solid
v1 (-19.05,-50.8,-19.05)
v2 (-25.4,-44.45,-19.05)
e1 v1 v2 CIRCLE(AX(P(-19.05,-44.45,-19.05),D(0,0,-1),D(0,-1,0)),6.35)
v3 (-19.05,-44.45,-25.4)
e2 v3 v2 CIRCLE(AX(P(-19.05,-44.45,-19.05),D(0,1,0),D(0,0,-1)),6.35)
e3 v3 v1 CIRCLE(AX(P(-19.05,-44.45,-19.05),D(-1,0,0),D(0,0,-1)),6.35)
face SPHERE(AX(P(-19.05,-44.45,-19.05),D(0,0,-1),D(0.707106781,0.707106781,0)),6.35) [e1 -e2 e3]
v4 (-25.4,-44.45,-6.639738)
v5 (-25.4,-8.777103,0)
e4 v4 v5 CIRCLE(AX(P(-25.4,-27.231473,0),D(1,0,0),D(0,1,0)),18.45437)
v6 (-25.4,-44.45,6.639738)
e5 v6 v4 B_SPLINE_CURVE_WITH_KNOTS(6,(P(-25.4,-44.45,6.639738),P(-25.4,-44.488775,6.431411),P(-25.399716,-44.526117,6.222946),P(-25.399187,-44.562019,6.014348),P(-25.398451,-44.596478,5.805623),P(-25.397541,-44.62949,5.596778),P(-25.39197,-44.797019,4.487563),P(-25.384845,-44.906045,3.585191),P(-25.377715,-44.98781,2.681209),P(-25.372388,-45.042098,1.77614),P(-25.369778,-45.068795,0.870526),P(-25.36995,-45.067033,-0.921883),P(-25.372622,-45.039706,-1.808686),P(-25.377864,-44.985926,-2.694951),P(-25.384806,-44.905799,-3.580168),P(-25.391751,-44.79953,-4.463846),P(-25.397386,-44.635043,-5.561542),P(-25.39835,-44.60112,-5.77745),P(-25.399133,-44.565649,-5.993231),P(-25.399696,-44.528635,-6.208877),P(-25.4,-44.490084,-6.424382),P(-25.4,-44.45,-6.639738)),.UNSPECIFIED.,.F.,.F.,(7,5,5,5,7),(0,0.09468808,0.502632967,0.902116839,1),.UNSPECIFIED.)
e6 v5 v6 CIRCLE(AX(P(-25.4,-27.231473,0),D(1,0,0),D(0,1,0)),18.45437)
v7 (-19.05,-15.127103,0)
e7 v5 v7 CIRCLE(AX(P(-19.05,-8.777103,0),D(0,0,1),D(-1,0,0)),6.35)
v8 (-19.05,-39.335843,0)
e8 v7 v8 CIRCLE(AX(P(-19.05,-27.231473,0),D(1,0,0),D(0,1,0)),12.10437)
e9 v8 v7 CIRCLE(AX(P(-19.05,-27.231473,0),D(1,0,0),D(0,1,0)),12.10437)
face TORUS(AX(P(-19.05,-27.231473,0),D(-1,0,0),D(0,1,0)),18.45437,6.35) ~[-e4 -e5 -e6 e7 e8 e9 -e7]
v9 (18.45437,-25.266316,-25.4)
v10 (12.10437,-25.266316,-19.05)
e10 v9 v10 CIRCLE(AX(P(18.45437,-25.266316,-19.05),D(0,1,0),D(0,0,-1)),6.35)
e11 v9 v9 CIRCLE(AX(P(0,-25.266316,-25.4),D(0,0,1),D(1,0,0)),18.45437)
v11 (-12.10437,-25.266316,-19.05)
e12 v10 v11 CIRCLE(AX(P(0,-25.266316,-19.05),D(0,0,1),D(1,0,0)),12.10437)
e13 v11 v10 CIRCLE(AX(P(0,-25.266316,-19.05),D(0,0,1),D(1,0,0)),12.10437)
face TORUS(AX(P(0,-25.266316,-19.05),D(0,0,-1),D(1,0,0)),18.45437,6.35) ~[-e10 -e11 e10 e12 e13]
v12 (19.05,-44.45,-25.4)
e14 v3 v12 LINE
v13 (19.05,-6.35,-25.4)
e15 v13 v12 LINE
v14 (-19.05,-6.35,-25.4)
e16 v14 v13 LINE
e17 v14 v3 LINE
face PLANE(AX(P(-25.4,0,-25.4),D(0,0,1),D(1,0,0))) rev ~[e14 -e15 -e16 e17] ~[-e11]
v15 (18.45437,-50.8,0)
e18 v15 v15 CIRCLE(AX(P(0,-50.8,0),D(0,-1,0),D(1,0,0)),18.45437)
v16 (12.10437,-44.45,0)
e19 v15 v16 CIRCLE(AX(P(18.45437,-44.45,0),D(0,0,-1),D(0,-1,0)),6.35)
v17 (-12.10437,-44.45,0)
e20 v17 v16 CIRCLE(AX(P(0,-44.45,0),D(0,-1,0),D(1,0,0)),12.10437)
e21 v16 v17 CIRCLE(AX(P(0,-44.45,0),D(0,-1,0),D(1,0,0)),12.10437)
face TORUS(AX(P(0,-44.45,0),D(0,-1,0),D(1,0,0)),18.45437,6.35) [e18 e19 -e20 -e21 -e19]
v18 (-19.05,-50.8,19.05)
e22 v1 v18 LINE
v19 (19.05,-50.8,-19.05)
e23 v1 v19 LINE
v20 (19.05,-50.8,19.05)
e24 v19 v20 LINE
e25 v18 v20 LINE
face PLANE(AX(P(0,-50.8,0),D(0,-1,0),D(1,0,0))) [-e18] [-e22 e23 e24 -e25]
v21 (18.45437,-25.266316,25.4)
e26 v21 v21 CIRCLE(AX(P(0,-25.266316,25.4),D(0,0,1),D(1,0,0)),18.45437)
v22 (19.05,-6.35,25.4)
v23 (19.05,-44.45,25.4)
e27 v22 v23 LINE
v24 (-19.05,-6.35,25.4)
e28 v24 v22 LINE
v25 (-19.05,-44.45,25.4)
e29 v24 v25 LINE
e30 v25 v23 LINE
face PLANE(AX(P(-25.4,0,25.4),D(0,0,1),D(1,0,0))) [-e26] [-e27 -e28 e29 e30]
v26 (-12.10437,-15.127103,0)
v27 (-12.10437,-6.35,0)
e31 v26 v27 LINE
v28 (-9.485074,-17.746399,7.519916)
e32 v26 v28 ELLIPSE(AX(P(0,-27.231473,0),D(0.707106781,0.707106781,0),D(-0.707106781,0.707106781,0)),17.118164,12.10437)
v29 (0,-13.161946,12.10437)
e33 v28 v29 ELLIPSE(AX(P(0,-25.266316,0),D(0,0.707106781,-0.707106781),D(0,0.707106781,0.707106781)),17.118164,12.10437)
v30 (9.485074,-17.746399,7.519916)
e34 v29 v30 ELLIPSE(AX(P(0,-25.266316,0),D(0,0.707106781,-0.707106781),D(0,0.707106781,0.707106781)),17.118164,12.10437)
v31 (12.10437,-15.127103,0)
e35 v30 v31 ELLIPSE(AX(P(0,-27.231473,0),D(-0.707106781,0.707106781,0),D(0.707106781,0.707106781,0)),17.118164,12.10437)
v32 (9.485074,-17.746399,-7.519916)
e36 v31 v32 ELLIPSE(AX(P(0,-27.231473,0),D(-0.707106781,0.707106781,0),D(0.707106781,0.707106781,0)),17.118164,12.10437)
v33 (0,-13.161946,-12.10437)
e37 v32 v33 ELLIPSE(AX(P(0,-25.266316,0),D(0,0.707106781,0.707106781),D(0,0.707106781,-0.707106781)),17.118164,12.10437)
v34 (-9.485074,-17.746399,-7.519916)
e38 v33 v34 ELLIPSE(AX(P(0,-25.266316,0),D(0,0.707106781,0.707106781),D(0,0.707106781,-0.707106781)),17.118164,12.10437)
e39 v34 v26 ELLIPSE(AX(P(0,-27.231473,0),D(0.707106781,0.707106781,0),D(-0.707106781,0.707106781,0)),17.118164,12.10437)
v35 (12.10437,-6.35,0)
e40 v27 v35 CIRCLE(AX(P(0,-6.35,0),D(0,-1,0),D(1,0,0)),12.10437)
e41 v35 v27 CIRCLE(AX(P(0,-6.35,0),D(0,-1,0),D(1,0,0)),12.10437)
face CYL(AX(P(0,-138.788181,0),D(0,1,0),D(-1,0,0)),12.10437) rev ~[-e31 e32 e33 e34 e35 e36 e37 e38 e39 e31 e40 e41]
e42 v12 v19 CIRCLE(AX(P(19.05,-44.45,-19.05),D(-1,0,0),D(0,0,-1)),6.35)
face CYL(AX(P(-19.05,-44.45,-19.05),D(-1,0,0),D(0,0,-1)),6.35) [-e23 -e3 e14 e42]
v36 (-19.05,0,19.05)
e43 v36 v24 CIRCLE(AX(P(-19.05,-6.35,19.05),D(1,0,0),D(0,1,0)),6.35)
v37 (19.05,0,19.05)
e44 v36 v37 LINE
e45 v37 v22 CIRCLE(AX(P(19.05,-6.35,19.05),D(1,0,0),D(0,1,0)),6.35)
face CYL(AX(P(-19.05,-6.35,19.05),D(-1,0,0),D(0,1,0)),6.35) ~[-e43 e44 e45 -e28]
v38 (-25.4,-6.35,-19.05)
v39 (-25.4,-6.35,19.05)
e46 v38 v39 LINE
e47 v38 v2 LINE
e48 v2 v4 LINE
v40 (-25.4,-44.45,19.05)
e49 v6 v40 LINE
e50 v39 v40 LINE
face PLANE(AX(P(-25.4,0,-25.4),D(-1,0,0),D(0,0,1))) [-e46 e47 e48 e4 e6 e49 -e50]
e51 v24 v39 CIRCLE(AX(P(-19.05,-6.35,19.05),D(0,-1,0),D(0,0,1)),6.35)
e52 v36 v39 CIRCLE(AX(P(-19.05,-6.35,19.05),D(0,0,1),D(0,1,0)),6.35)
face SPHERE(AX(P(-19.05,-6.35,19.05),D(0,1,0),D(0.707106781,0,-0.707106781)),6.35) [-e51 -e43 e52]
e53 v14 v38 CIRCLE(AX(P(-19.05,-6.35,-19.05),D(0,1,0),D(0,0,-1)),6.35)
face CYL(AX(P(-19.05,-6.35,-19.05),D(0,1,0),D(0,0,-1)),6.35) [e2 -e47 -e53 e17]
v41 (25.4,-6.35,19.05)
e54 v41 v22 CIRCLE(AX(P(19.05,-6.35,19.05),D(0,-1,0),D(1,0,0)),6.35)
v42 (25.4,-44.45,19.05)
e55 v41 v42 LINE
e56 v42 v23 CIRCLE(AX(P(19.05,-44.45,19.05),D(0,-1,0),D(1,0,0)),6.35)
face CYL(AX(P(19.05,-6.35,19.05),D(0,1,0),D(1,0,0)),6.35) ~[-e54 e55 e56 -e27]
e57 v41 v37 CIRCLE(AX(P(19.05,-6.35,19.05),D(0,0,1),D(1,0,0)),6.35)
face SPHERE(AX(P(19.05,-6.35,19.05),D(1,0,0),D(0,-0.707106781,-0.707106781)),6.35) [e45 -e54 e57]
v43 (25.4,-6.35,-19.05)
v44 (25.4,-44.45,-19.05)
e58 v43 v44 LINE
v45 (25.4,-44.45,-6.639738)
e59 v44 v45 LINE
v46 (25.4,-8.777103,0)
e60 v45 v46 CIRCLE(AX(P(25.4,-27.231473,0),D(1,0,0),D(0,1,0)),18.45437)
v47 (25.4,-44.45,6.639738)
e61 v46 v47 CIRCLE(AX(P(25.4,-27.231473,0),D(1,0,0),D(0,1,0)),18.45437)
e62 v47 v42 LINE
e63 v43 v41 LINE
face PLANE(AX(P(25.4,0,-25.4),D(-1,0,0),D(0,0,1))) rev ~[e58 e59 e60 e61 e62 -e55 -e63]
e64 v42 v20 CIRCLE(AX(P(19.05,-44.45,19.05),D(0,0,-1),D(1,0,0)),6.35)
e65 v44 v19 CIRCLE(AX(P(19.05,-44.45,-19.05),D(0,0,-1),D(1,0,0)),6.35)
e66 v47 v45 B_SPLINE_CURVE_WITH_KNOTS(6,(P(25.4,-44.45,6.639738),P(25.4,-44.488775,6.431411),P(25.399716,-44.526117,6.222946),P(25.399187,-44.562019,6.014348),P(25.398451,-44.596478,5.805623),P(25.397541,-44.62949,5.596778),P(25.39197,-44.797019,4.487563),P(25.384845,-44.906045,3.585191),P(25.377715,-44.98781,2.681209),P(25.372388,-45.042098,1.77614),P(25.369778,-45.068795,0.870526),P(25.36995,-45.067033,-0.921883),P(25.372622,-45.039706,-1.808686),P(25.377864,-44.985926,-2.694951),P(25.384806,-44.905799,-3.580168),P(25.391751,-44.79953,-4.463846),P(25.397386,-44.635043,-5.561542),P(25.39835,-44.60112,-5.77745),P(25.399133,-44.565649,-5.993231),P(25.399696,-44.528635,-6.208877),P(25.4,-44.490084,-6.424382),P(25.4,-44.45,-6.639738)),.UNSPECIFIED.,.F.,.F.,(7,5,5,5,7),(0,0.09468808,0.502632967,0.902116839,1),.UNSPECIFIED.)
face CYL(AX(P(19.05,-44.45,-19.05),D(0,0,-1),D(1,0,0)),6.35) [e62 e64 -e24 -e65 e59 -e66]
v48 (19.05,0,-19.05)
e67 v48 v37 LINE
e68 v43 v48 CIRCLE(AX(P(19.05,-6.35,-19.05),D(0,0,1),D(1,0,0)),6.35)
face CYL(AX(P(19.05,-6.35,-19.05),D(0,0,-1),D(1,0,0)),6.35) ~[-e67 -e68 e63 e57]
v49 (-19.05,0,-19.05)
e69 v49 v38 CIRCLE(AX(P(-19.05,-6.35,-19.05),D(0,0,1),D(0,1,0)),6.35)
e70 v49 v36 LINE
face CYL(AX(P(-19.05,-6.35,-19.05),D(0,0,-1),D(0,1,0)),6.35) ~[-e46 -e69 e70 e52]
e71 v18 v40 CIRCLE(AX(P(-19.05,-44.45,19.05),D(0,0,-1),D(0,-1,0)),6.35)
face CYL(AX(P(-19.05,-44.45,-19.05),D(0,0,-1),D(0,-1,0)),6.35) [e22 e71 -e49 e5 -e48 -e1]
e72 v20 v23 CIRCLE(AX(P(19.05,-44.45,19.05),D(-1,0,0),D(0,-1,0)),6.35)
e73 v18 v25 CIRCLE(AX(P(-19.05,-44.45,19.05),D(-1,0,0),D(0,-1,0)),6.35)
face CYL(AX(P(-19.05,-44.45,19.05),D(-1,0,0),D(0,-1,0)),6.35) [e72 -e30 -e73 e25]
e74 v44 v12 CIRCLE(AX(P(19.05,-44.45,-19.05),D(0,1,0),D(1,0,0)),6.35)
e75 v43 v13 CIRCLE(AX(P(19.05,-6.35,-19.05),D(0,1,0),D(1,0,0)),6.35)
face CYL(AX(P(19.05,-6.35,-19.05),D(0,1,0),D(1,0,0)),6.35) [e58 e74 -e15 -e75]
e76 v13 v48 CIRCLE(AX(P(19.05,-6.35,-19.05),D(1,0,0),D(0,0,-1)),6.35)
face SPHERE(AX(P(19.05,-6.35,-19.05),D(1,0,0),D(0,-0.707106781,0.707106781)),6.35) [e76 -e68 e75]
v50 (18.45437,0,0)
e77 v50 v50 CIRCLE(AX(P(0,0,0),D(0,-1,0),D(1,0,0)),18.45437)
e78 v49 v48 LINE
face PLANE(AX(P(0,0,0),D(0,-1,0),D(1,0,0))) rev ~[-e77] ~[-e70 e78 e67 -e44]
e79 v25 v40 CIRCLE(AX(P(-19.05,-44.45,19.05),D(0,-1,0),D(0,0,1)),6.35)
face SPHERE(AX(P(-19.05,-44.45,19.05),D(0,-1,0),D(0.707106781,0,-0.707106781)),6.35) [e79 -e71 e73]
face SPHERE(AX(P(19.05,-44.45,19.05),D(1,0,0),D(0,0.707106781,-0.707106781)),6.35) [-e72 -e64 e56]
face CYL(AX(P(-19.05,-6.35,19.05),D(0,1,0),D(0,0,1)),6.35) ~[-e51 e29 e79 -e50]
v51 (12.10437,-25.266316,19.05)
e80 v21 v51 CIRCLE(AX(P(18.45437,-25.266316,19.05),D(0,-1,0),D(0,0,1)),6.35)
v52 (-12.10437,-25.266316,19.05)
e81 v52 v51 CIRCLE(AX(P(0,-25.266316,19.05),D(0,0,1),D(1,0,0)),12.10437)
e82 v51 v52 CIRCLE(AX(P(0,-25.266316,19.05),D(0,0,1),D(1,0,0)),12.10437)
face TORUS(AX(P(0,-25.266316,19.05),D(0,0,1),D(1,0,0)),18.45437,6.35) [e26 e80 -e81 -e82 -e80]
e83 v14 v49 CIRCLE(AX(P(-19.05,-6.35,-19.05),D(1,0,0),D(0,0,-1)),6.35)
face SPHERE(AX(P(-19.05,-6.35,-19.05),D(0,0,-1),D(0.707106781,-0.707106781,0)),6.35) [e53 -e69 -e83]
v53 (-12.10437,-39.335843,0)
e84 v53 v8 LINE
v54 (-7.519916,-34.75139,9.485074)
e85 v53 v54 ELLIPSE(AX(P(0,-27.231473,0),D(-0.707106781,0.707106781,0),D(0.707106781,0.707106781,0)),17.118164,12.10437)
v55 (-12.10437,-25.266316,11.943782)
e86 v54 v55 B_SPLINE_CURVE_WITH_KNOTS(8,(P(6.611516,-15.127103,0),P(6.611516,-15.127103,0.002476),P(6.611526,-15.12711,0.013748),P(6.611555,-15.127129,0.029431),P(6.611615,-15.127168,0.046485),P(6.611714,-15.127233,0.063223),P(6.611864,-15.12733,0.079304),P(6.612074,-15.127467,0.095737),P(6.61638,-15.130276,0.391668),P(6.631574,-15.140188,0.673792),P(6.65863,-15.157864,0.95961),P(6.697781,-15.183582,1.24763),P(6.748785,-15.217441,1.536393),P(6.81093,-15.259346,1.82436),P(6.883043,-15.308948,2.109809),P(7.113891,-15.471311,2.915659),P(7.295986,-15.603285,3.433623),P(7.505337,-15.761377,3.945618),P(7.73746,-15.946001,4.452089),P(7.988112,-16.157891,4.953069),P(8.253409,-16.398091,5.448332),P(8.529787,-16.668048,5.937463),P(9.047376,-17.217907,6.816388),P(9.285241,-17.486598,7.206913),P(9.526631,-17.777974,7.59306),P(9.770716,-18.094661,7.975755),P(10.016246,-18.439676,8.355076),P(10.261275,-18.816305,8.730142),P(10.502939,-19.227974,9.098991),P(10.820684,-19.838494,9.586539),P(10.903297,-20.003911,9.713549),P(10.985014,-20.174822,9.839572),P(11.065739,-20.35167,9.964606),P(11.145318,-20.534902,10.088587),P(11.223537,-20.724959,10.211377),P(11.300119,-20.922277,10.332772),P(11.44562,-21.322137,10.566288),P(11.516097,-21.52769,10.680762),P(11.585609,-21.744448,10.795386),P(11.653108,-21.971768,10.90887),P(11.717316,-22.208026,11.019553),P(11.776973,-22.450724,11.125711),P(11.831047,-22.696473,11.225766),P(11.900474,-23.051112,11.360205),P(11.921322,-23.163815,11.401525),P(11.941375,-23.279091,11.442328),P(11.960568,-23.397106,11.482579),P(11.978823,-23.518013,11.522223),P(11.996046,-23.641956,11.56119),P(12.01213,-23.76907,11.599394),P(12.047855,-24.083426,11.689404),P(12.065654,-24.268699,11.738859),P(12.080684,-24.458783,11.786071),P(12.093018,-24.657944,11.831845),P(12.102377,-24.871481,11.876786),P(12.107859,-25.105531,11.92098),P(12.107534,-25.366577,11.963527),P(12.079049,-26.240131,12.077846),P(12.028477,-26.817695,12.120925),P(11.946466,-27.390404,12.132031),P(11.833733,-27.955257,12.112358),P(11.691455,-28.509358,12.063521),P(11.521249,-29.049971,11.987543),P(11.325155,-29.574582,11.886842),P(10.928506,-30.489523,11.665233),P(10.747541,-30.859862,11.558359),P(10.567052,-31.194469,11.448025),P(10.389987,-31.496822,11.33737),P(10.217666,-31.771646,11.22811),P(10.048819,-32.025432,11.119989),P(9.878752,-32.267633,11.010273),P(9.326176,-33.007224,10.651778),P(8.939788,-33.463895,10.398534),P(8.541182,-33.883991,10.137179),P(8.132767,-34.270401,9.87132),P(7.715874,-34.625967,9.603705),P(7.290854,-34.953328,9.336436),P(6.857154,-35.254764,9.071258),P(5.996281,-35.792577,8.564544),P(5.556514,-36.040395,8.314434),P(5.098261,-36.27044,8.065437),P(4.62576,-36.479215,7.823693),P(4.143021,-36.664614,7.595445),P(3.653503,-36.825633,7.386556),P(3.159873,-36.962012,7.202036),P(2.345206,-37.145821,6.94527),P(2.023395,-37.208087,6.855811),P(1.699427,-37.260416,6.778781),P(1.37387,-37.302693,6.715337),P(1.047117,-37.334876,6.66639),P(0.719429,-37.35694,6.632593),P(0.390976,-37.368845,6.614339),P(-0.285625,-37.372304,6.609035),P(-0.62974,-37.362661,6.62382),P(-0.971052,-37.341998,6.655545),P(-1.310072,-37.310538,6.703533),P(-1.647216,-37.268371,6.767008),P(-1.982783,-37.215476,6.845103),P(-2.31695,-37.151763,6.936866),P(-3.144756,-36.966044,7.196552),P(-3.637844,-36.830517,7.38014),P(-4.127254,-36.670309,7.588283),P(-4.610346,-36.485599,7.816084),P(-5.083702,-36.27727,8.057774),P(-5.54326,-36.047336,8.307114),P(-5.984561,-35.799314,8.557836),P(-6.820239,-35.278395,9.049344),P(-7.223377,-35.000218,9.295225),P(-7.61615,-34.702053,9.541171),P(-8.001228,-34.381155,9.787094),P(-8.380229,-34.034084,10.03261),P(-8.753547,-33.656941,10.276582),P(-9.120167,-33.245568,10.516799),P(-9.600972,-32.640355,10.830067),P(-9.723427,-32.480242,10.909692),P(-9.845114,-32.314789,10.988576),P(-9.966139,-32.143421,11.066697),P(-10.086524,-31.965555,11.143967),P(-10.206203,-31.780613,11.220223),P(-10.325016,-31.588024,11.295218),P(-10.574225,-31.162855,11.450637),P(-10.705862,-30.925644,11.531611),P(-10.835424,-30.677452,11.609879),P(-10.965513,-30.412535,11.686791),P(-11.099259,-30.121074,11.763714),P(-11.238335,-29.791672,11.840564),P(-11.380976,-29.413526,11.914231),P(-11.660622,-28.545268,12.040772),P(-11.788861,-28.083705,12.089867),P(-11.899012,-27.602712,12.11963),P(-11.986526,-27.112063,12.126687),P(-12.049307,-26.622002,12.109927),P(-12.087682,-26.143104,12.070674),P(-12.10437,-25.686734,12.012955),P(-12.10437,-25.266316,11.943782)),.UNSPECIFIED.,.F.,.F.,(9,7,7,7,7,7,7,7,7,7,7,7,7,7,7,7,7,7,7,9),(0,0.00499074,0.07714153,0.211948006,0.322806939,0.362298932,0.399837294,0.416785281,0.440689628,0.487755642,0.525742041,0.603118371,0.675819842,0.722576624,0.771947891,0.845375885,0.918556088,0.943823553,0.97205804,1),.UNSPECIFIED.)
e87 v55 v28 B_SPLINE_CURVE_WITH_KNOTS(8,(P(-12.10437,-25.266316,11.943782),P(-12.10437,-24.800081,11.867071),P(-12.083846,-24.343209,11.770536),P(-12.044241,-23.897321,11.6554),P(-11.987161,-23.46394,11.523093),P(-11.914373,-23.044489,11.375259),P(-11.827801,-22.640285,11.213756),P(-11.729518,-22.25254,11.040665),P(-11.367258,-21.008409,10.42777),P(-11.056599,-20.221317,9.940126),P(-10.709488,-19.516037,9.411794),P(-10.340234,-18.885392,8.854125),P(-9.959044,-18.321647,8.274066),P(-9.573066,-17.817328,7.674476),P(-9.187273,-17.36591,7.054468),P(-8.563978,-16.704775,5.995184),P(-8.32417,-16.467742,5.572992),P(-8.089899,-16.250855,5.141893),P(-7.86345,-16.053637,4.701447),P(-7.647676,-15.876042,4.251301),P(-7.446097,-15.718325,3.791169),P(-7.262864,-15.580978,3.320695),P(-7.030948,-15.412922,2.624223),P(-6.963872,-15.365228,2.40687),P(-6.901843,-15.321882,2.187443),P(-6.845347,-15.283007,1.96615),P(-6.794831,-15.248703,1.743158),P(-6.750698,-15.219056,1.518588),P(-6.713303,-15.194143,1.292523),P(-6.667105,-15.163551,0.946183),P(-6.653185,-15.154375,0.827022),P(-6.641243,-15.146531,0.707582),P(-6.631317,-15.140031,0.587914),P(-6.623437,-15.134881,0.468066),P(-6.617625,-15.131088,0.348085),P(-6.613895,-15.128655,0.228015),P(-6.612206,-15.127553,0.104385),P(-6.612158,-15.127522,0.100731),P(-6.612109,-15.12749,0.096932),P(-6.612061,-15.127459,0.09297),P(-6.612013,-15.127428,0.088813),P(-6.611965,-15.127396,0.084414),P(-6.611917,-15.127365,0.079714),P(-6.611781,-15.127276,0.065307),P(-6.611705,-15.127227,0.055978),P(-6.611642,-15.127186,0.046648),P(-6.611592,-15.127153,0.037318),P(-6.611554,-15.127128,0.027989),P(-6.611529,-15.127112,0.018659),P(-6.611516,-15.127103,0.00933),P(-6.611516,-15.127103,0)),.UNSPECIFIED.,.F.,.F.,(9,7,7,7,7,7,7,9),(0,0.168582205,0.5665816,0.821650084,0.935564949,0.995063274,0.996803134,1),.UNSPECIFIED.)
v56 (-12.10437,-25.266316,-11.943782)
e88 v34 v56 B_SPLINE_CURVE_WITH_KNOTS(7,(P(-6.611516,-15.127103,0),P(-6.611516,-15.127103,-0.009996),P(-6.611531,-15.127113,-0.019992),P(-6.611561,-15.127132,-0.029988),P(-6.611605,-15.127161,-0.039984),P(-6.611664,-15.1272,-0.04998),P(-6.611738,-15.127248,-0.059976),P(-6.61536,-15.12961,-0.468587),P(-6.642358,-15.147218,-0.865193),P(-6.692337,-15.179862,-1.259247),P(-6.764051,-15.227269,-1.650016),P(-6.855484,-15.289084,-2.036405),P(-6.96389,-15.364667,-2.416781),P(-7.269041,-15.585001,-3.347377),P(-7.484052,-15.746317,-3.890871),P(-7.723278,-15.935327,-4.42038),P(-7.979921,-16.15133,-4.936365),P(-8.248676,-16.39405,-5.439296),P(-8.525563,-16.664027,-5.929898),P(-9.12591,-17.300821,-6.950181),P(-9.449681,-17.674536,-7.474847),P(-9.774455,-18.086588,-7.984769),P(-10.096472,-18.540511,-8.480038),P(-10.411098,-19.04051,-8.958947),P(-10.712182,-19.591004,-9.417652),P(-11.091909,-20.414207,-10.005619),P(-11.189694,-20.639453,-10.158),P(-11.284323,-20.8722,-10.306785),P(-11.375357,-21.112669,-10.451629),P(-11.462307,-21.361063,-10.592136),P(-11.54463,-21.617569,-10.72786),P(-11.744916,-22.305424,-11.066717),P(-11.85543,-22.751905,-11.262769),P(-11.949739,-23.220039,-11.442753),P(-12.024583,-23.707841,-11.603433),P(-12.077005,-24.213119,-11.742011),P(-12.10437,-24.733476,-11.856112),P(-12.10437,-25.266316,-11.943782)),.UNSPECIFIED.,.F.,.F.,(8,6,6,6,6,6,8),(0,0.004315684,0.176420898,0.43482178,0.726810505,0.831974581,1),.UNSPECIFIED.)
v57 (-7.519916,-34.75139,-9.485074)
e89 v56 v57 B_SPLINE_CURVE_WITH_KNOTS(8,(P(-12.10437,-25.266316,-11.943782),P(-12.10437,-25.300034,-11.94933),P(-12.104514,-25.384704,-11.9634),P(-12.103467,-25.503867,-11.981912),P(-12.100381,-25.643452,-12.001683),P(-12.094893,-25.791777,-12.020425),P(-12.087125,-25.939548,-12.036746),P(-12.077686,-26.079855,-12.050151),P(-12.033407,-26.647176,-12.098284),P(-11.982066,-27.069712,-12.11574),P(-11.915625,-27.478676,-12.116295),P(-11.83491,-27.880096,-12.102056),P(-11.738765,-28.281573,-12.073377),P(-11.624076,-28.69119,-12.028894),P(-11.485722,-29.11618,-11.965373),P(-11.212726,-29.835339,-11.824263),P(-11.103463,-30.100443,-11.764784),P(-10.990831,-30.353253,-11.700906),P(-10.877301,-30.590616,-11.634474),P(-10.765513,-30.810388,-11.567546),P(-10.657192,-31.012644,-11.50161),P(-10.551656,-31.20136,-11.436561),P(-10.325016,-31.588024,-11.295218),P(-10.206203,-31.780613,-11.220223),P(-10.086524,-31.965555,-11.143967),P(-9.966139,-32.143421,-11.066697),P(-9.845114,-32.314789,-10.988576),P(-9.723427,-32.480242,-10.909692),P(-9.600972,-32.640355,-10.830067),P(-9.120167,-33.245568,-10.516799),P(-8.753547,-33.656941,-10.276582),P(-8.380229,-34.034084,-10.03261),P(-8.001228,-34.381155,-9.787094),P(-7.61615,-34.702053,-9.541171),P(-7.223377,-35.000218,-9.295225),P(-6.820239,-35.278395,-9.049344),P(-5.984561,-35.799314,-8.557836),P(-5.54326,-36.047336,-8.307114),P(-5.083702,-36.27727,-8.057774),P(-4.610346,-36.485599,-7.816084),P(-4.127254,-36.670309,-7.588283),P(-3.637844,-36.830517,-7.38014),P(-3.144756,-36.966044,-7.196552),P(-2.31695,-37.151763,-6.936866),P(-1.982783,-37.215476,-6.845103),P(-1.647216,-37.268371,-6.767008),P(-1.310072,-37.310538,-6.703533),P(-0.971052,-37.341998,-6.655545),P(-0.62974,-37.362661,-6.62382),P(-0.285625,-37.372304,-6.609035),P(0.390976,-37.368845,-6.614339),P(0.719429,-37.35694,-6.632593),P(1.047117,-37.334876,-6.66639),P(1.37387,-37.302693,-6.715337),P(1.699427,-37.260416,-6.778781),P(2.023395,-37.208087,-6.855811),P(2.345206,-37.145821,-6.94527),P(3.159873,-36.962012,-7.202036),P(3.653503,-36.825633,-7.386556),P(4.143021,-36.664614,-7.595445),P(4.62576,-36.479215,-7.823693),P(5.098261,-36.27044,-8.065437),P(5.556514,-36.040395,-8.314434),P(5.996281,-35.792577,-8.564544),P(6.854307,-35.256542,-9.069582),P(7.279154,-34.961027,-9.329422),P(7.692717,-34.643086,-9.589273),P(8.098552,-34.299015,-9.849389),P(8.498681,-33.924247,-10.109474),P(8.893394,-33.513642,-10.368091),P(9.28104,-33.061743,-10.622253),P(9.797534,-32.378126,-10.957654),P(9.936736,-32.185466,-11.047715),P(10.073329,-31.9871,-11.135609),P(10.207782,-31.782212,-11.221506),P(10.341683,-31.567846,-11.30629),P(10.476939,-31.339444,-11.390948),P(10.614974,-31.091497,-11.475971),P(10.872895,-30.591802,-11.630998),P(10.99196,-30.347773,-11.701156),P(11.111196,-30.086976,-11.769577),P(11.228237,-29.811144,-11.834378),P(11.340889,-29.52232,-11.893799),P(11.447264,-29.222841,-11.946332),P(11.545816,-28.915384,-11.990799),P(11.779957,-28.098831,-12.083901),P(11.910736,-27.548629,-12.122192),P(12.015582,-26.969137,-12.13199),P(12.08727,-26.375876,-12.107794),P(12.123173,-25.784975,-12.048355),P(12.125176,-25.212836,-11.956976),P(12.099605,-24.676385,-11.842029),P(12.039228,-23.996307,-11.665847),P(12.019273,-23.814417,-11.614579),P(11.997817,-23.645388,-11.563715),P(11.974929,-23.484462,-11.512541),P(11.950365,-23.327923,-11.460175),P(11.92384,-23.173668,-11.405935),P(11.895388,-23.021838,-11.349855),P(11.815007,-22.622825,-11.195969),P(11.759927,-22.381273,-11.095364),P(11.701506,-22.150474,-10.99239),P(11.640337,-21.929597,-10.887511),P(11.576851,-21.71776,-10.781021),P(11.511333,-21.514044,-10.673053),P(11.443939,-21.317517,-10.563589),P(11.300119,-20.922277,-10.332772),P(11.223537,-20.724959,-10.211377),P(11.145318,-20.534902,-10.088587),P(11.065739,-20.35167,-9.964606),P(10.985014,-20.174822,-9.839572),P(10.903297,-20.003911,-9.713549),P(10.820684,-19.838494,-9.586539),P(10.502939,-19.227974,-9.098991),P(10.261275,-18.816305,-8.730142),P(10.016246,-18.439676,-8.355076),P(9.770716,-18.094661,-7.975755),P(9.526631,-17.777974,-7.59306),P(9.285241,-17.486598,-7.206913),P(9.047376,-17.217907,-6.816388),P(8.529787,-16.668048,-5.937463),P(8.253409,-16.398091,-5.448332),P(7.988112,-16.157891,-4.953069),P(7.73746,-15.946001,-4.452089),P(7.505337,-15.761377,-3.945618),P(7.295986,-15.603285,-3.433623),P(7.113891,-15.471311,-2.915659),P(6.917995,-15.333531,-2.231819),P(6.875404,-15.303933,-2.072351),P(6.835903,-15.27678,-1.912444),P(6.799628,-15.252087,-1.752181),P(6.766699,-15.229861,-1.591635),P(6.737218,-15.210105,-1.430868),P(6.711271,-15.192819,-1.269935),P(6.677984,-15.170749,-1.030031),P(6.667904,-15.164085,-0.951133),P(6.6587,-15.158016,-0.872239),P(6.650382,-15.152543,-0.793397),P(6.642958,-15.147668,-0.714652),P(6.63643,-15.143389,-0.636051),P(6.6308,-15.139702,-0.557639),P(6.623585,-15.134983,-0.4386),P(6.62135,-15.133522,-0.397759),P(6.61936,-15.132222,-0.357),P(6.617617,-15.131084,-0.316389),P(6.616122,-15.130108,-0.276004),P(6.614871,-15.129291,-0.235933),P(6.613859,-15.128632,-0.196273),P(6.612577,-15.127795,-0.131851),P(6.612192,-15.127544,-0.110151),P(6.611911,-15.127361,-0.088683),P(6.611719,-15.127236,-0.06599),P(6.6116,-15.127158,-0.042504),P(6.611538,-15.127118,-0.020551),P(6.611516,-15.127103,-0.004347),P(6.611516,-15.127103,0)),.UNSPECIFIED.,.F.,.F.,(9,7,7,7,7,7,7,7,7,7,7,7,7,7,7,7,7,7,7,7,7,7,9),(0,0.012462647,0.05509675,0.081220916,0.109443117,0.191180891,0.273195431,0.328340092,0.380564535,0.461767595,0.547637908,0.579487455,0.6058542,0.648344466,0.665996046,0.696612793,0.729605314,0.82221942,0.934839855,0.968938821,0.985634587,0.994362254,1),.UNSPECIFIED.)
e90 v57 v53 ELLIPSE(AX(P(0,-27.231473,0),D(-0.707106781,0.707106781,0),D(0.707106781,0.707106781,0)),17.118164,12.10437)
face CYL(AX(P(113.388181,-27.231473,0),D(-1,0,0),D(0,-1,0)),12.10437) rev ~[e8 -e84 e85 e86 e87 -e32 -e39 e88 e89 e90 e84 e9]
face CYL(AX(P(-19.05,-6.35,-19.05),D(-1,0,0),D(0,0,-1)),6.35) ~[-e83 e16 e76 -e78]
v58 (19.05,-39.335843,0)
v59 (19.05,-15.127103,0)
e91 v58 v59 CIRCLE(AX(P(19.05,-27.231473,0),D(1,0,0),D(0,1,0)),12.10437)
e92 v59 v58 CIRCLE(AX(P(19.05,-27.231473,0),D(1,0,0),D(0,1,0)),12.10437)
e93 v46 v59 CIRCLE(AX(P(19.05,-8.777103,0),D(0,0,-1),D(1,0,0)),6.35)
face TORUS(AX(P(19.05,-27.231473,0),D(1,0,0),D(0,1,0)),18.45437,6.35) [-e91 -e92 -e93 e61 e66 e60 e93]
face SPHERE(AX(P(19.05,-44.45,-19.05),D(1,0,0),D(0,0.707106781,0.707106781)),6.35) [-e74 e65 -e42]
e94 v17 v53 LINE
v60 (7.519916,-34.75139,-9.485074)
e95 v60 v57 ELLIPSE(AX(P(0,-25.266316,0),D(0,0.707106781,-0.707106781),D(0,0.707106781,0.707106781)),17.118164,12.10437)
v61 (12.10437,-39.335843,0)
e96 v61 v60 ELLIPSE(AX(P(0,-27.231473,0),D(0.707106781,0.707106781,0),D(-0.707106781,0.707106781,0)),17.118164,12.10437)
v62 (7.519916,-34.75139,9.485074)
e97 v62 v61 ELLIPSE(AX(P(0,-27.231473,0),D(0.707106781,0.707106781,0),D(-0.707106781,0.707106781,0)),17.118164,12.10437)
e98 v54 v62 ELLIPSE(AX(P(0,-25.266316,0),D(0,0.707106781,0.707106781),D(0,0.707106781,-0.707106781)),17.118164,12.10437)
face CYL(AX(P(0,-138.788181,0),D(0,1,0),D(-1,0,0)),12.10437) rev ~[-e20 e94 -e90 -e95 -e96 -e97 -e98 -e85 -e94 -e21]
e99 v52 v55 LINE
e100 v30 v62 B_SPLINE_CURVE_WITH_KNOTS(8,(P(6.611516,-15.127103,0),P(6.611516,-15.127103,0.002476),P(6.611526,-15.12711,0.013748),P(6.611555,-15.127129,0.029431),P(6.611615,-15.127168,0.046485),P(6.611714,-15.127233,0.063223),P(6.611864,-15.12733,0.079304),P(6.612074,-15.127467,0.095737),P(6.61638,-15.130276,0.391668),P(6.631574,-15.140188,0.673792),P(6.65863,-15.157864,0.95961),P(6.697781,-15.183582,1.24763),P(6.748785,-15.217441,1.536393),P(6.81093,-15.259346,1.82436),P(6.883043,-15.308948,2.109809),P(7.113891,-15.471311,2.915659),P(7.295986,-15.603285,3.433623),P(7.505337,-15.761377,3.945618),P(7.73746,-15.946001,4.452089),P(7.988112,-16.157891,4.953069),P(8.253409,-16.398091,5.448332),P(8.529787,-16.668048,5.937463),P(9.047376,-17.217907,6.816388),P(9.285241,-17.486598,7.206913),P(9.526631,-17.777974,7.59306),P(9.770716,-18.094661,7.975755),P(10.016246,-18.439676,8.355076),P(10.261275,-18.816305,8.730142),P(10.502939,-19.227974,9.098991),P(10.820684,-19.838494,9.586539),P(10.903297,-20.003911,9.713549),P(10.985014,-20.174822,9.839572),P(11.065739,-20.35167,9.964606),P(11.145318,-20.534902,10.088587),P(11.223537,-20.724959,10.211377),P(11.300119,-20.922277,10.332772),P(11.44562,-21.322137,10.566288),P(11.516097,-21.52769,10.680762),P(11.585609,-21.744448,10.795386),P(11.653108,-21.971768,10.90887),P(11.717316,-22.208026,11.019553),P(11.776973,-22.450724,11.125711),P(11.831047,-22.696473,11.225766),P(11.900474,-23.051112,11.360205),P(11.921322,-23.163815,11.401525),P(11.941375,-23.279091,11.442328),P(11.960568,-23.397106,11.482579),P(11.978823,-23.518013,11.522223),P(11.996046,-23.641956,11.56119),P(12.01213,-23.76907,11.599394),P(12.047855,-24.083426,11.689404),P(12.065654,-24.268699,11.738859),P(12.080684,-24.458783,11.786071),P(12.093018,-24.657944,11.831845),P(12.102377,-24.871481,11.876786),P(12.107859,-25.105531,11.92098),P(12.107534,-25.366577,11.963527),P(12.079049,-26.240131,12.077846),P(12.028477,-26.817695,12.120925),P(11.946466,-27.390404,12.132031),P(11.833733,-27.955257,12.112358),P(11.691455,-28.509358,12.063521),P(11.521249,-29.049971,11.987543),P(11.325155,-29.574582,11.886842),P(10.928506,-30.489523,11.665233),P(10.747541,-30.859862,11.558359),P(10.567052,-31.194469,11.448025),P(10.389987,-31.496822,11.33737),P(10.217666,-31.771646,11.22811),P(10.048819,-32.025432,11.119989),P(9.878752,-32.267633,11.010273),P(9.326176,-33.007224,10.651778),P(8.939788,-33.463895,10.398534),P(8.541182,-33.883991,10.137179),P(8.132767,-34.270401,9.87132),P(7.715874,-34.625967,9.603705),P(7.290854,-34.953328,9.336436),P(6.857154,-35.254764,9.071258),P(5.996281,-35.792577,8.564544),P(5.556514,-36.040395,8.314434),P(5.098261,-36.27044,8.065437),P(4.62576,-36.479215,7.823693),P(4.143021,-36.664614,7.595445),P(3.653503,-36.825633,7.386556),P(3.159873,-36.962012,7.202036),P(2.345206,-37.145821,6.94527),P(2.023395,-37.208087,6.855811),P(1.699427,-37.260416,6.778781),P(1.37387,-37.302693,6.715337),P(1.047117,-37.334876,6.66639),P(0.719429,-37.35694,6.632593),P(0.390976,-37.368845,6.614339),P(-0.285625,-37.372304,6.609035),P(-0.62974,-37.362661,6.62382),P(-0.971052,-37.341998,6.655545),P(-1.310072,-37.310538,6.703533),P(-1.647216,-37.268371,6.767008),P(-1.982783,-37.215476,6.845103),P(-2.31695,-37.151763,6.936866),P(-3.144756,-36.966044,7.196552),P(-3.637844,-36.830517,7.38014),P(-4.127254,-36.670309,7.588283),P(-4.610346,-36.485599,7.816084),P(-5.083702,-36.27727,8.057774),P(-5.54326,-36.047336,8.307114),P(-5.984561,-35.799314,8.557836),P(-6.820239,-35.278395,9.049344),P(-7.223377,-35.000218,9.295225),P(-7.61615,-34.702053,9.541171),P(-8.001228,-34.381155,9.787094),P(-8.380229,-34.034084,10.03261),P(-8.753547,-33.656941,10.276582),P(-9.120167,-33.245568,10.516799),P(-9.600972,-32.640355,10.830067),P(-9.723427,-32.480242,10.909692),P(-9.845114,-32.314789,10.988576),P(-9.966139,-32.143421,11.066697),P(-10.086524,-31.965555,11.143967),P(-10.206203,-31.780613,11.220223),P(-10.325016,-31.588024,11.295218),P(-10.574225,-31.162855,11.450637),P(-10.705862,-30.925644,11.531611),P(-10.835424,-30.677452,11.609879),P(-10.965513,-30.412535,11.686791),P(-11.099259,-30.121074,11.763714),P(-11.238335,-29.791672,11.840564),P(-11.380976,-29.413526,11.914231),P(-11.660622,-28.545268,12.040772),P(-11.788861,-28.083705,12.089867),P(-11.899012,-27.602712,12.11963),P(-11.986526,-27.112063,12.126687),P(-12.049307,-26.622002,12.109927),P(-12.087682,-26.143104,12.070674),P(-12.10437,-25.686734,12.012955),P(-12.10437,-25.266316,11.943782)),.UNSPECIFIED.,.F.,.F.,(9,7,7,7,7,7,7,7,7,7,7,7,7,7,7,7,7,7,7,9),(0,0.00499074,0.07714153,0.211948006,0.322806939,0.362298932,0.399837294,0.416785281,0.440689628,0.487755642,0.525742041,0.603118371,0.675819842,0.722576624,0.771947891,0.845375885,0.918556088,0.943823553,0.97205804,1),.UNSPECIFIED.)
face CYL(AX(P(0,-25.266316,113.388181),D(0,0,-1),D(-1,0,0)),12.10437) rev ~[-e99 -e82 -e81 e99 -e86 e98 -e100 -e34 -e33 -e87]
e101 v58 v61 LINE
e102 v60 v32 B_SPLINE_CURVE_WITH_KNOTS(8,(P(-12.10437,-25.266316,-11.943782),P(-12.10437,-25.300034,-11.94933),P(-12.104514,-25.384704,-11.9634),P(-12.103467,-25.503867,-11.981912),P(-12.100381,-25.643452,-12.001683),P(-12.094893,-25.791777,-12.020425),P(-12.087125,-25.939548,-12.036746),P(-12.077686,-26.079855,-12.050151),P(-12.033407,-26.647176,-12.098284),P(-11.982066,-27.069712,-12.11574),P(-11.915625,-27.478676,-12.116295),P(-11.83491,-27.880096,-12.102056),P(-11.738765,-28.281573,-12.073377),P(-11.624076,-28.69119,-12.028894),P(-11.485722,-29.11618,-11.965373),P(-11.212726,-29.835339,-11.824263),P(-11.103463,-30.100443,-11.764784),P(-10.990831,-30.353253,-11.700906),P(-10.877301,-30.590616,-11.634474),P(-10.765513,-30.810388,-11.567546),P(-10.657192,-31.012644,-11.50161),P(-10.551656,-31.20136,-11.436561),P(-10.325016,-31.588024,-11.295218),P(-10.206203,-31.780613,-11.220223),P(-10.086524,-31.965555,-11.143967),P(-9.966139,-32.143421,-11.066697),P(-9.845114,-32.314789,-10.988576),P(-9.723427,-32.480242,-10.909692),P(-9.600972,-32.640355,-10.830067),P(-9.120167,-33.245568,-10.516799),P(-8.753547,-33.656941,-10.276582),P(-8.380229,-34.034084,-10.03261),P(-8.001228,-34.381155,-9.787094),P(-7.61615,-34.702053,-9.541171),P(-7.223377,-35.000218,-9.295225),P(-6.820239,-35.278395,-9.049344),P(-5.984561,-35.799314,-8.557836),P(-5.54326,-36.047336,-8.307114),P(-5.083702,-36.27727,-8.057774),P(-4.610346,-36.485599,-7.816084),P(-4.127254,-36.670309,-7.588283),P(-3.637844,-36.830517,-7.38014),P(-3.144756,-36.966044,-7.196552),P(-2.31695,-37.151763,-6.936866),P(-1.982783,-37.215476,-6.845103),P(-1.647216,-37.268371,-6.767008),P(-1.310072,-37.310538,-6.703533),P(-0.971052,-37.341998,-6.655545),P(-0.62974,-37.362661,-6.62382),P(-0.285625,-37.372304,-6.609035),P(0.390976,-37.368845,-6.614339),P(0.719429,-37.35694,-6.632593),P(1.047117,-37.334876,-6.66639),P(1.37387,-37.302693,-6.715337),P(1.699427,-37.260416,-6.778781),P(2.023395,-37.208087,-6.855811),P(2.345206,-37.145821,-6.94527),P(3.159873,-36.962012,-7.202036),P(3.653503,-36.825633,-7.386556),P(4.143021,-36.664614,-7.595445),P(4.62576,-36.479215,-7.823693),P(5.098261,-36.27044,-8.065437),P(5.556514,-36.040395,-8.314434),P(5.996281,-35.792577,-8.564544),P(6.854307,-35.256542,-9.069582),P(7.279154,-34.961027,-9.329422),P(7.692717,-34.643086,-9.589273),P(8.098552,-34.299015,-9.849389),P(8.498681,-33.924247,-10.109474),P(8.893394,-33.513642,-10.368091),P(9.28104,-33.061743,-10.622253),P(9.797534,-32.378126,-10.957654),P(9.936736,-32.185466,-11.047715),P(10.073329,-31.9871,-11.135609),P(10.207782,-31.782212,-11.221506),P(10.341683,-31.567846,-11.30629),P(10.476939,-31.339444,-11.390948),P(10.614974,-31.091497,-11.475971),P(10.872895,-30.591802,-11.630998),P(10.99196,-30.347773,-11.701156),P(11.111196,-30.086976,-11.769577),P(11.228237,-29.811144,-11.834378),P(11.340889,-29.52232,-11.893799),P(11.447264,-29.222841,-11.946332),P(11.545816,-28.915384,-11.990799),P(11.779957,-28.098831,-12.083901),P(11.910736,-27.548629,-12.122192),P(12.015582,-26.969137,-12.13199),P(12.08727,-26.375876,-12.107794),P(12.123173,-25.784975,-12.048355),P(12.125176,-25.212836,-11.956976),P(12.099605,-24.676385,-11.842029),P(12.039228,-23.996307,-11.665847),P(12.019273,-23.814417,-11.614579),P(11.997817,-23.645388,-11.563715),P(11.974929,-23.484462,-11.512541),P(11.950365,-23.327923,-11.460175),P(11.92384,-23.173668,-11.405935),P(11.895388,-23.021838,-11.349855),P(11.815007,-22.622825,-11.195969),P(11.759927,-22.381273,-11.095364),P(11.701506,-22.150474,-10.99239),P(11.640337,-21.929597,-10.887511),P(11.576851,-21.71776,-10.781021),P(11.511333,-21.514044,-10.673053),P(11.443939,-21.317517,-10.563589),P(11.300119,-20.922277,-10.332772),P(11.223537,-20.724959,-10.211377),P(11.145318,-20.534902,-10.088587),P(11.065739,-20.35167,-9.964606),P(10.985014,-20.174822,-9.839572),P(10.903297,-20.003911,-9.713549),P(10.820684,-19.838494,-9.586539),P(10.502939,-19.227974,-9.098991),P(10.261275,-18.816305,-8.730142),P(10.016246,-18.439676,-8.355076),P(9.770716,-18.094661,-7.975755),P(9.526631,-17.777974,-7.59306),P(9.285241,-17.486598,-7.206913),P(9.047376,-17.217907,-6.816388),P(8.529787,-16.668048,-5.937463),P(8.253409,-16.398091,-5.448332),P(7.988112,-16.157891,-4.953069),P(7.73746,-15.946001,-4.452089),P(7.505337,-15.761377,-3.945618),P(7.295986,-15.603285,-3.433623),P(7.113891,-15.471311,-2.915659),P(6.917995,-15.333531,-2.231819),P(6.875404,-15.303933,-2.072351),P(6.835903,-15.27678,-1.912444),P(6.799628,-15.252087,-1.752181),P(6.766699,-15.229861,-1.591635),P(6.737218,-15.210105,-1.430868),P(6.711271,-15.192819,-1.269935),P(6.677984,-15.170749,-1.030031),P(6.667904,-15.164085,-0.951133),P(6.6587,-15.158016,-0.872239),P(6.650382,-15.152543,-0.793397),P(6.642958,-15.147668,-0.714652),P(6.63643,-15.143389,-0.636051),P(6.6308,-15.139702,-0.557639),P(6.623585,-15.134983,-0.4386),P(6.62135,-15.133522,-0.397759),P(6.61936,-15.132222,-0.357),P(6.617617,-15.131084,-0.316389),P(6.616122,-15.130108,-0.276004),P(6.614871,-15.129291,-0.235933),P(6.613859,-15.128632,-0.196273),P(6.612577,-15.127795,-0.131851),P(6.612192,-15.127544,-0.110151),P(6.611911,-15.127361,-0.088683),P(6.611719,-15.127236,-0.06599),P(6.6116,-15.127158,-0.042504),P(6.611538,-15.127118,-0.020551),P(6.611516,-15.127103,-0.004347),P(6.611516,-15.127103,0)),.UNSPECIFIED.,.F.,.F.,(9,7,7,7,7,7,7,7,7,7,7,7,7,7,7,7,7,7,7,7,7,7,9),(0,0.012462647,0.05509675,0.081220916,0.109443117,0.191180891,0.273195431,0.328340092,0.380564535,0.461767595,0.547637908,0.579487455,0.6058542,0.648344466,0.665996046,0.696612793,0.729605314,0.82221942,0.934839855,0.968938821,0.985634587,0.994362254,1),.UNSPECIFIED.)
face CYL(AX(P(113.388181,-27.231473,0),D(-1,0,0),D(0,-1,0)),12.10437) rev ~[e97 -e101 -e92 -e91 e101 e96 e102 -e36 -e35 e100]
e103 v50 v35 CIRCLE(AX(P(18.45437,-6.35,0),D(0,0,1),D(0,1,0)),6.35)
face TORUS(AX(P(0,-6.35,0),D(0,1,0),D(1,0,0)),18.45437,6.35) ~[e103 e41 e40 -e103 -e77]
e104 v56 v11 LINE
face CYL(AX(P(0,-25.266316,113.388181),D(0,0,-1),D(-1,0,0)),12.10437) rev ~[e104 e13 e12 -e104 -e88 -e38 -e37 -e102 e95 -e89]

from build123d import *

# Parameters (mm, degrees)
F0_W         = 50.8
F0_H         = 50.8
F1_DEPTH     = 50.8
F3_D         = 24.20874
F5_D         = 24.20874
F7_D         = 24.20874
F8_T1_DEPTH  = 38.1
F8_T3_DEPTH  = 38.1
F8_T5_DEPTH  = 38.1
F8_S9_W      = 6.35
F8_S9_H      = 6.35
F8_T10_DEPTH = 6.35
F8_S15_W     = 6.35
F8_S15_H     = 6.35
F8_T16_DEPTH = 6.35
F8_S21_W     = 6.35
F8_S21_H     = 6.35
F8_T22_DEPTH = 6.35
F8_S27_W     = 6.35
F8_S27_H     = 6.35
F8_T28_DEPTH = 6.35
F8_S33_W     = 6.35
F8_S33_H     = 6.35
F8_T34_DEPTH = 6.35
F8_S39_W     = 6.35
F8_S39_H     = 6.35
F8_T40_DEPTH = 6.35
F8_S45_W     = 6.35
F8_S45_H     = 6.35
F8_T46_DEPTH = 6.35
F8_S51_W     = 6.35
F8_S51_H     = 6.35
F8_T52_DEPTH = 6.35


# Not quite as in the source:
# - a fillet or chamfer that OpenCascade refuses, or shapes differently, is made with other operations: its cross-section is extruded or revolved along the edge and cut away or added


with BuildPart() as f1:
    # F0 (on Front) → F1 (new body)
    with BuildSketch(Plane.XZ):
        Rectangle(F0_W, F0_H)
    extrude(amount=F1_DEPTH)

    # F3 (through all)
    with Locations(Plane.XZ.offset(50.8)):
        with Locations((0, 0)):
            Hole(F3_D / 2)

    # F5 (through all)
    with Locations(Plane.XY.offset(25.4)):
        with Locations((0, -25.266315788)):
            Hole(F5_D / 2)

    # F7 (through all)
    with Locations(Plane.YZ.offset(25.4)):
        with Locations((-27.2314734757, 0)):
            Hole(F7_D / 2)

    # F8: fillet of radius 6.35 on 18 edges, made by hand

    # F8_s2 → F8_t1 (cut)
    with BuildSketch(Plane.YZ.offset(-19.05)):
        with BuildLine():
            ThreePointArc((-50.8, 19.05), (-48.9401280605, 23.5401280605), (-44.45, 25.4))
            Line((-44.45, 25.4), (-50.8, 25.4))
            Line((-50.8, 25.4), (-50.8, 19.05))
        make_face()
        with BuildLine():
            ThreePointArc((0, 19.05), (-1.8598719395, 23.5401280605), (-6.35, 25.4))
            Line((-6.35, 25.4), (0, 25.4))
            Line((0, 25.4), (0, 19.05))
        make_face()
        with BuildLine():
            ThreePointArc((-44.45, -25.4), (-48.9401280605, -23.5401280605), (-50.8, -19.05))
            Line((-50.8, -19.05), (-50.8, -25.4))
            Line((-50.8, -25.4), (-44.45, -25.4))
        make_face()
        with BuildLine():
            ThreePointArc((-6.35, -25.4), (-1.8598719395, -23.5401280605), (0, -19.05))
            Line((0, -19.05), (0, -25.4))
            Line((0, -25.4), (-6.35, -25.4))
        make_face()
    extrude(amount=F8_T1_DEPTH, mode=Mode.SUBTRACT)

    # F8_s4 → F8_t3 (cut)
    with BuildSketch(Plane.XZ.offset(6.35)):
        with BuildLine():
            ThreePointArc((25.4, 19.05), (23.5401280605, 23.5401280605), (19.05, 25.4))
            Line((19.05, 25.4), (25.4, 25.4))
            Line((25.4, 25.4), (25.4, 19.05))
        make_face()
        with BuildLine():
            ThreePointArc((25.4, -19.05), (23.5401280605, -23.5401280605), (19.05, -25.4))
            Line((19.05, -25.4), (25.4, -25.4))
            Line((25.4, -25.4), (25.4, -19.05))
        make_face()
        with BuildLine():
            ThreePointArc((-19.05, 25.4), (-23.5401280605, 23.5401280605), (-25.4, 19.05))
            Line((-25.4, 19.05), (-25.4, 25.4))
            Line((-25.4, 25.4), (-19.05, 25.4))
        make_face()
        with BuildLine():
            ThreePointArc((-19.05, -25.4), (-23.5401280605, -23.5401280605), (-25.4, -19.05))
            Line((-25.4, -19.05), (-25.4, -25.4))
            Line((-25.4, -25.4), (-19.05, -25.4))
        make_face()
    extrude(amount=F8_T3_DEPTH, mode=Mode.SUBTRACT)

    # F8_s6 → F8_t5 (cut)
    with BuildSketch(Plane.XY.offset(-19.05)):
        with BuildLine():
            ThreePointArc((25.4, -44.45), (23.5401280605, -48.9401280605), (19.05, -50.8))
            Line((19.05, -50.8), (25.4, -50.8))
            Line((25.4, -50.8), (25.4, -44.45))
        make_face()
        with BuildLine():
            ThreePointArc((25.4, -6.35), (23.5401280605, -1.8598719395), (19.05, 0))
            Line((19.05, 0), (25.4, 0))
            Line((25.4, 0), (25.4, -6.35))
        make_face()
        with BuildLine():
            ThreePointArc((-19.05, -50.8), (-23.5401280605, -48.9401280605), (-25.4, -44.45))
            Line((-25.4, -44.45), (-25.4, -50.8))
            Line((-25.4, -50.8), (-19.05, -50.8))
        make_face()
        with BuildLine():
            ThreePointArc((-19.05, 0), (-23.5401280605, -1.8598719395), (-25.4, -6.35))
            Line((-25.4, -6.35), (-25.4, 0))
            Line((-25.4, 0), (-19.05, 0))
        make_face()
    extrude(amount=F8_T5_DEPTH, mode=Mode.SUBTRACT)


with BuildPart() as f8_tool8:
    # F8_s9 → F8_t10 (new body)
    with BuildSketch(Plane.YZ.offset(19.05)):
        with Locations((-47.625, 22.225)):
            Rectangle(F8_S9_W, F8_S9_H)
    extrude(amount=F8_T10_DEPTH)

    # F8_s11 → F8_t12 (revolve, cut)
    with BuildSketch(Plane(origin=(19.05, -44.45, 19.05), x_dir=(0, 0.7071067812, -0.7071067812), z_dir=(0, -0.7071067812, -0.7071067812))):
        with BuildLine():
            ThreePointArc((0, -6.35), (6.35, 0), (0, 6.35))
            Line((0, 6.35), (0, -6.35))
        make_face()
    revolve(axis=Axis((19.05, -44.45, 19.05), (1, 0, 0)), mode=Mode.SUBTRACT)


with BuildPart() as f1_1:
    add(f1.part)

    # F8_t7: cut F8_tool8
    add(f8_tool8.part, mode=Mode.SUBTRACT)


with BuildPart() as f8_tool14:
    # F8_s15 → F8_t16 (new body)
    with BuildSketch(Plane.XZ.offset(44.45)):
        with Locations((-22.225, 22.225)):
            Rectangle(F8_S15_W, F8_S15_H)
    extrude(amount=F8_T16_DEPTH)

    # F8_s17 → F8_t18 (revolve, cut)
    with BuildSketch(Plane(origin=(-19.05, -44.45, 19.05), x_dir=(0.7071067812, 0, -0.7071067812), z_dir=(-0.7071067812, 0, -0.7071067812))):
        with BuildLine():
            ThreePointArc((0, -6.35), (6.35, 0), (0, 6.35))
            Line((0, 6.35), (0, -6.35))
        make_face()
    revolve(axis=Axis((-19.05, -44.45, 19.05), (0, -1, 0)), mode=Mode.SUBTRACT)


with BuildPart() as f1_2:
    add(f1_1.part)

    # F8_t13: cut F8_tool14
    add(f8_tool14.part, mode=Mode.SUBTRACT)


with BuildPart() as f8_tool20:
    # F8_s21 → F8_t22 (new body)
    with BuildSketch(Plane.YZ.offset(19.05)):
        with Locations((-3.175, 22.225)):
            Rectangle(F8_S21_W, F8_S21_H)
    extrude(amount=F8_T22_DEPTH)

    # F8_s23 → F8_t24 (revolve, cut)
    with BuildSketch(Plane(origin=(19.05, -6.35, 19.05), x_dir=(0, -0.7071067812, -0.7071067812), z_dir=(0, -0.7071067812, 0.7071067812))):
        with BuildLine():
            ThreePointArc((0, -6.35), (6.35, 0), (0, 6.35))
            Line((0, 6.35), (0, -6.35))
        make_face()
    revolve(axis=Axis((19.05, -6.35, 19.05), (1, 0, 0)), mode=Mode.SUBTRACT)


with BuildPart() as f1_3:
    add(f1_2.part)

    # F8_t19: cut F8_tool20
    add(f8_tool20.part, mode=Mode.SUBTRACT)


with BuildPart() as f8_tool26:
    # F8_s27 → F8_t28 (new body)
    with BuildSketch(Plane.YZ.offset(19.05)):
        with Locations((-47.625, -22.225)):
            Rectangle(F8_S27_W, F8_S27_H)
    extrude(amount=F8_T28_DEPTH)

    # F8_s29 → F8_t30 (revolve, cut)
    with BuildSketch(Plane(origin=(19.05, -44.45, -19.05), x_dir=(0, 0.7071067812, 0.7071067812), z_dir=(0, 0.7071067812, -0.7071067812))):
        with BuildLine():
            ThreePointArc((0, -6.35), (6.35, 0), (0, 6.35))
            Line((0, 6.35), (0, -6.35))
        make_face()
    revolve(axis=Axis((19.05, -44.45, -19.05), (1, 0, 0)), mode=Mode.SUBTRACT)


with BuildPart() as f1_4:
    add(f1_3.part)

    # F8_t25: cut F8_tool26
    add(f8_tool26.part, mode=Mode.SUBTRACT)


with BuildPart() as f8_tool32:
    # F8_s33 → F8_t34 (new body)
    with BuildSketch(Plane.YZ.offset(19.05)):
        with Locations((-3.175, -22.225)):
            Rectangle(F8_S33_W, F8_S33_H)
    extrude(amount=F8_T34_DEPTH)

    # F8_s35 → F8_t36 (revolve, cut)
    with BuildSketch(Plane(origin=(19.05, -6.35, -19.05), x_dir=(0, -0.7071067812, 0.7071067812), z_dir=(0, 0.7071067812, 0.7071067812))):
        with BuildLine():
            ThreePointArc((0, -6.35), (6.35, 0), (0, 6.35))
            Line((0, 6.35), (0, -6.35))
        make_face()
    revolve(axis=Axis((19.05, -6.35, -19.05), (1, 0, 0)), mode=Mode.SUBTRACT)


with BuildPart() as f1_5:
    add(f1_4.part)

    # F8_t31: cut F8_tool32
    add(f8_tool32.part, mode=Mode.SUBTRACT)


with BuildPart() as f8_tool38:
    # F8_s39 → F8_t40 (new body)
    with BuildSketch(Plane.XZ.offset(6.35)):
        with Locations((-22.225, 22.225)):
            Rectangle(F8_S39_W, F8_S39_H)
    extrude(amount=-F8_T40_DEPTH)

    # F8_s41 → F8_t42 (revolve, cut)
    with BuildSketch(Plane(origin=(-19.05, -6.35, 19.05), x_dir=(0.7071067812, 0, -0.7071067812), z_dir=(0.7071067812, 0, 0.7071067812))):
        with BuildLine():
            ThreePointArc((0, -6.35), (6.35, 0), (0, 6.35))
            Line((0, 6.35), (0, -6.35))
        make_face()
    revolve(axis=Axis((-19.05, -6.35, 19.05), (0, 1, 0)), mode=Mode.SUBTRACT)


with BuildPart() as f1_6:
    add(f1_5.part)

    # F8_t37: cut F8_tool38
    add(f8_tool38.part, mode=Mode.SUBTRACT)


with BuildPart() as f8_tool44:
    # F8_s45 → F8_t46 (new body)
    with BuildSketch(Plane.XY.offset(-19.05)):
        with Locations((-22.225, -47.625)):
            Rectangle(F8_S45_W, F8_S45_H)
    extrude(amount=-F8_T46_DEPTH)

    # F8_s47 → F8_t48 (revolve, cut)
    with BuildSketch(Plane(origin=(-19.05, -44.45, -19.05), x_dir=(0.7071067812, 0.7071067812, 0), z_dir=(-0.7071067812, 0.7071067812, 0))):
        with BuildLine():
            ThreePointArc((0, -6.35), (6.35, 0), (0, 6.35))
            Line((0, 6.35), (0, -6.35))
        make_face()
    revolve(axis=Axis((-19.05, -44.45, -19.05), (0, 0, -1)), mode=Mode.SUBTRACT)


with BuildPart() as f1_7:
    add(f1_6.part)

    # F8_t43: cut F8_tool44
    add(f8_tool44.part, mode=Mode.SUBTRACT)


with BuildPart() as f8_tool50:
    # F8_s51 → F8_t52 (new body)
    with BuildSketch(Plane.XY.offset(-19.05)):
        with Locations((-22.225, -3.175)):
            Rectangle(F8_S51_W, F8_S51_H)
    extrude(amount=-F8_T52_DEPTH)

    # F8_s53 → F8_t54 (revolve, cut)
    with BuildSketch(Plane(origin=(-19.05, -6.35, -19.05), x_dir=(0.7071067812, -0.7071067812, 0), z_dir=(0.7071067812, 0.7071067812, 0))):
        with BuildLine():
            ThreePointArc((0, -6.35), (6.35, 0), (0, 6.35))
            Line((0, 6.35), (0, -6.35))
        make_face()
    revolve(axis=Axis((-19.05, -6.35, -19.05), (0, 0, -1)), mode=Mode.SUBTRACT)


with BuildPart() as f1_8:
    add(f1_7.part)

    # F8_t49: cut F8_tool50
    add(f8_tool50.part, mode=Mode.SUBTRACT)

    # F8_s55 → F8_t56 (revolve, cut)
    with BuildSketch(Plane.XY):
        with BuildLine():
            ThreePointArc((25.4, -8.7771034757), (23.5401280605, -13.2672315362), (19.05, -15.1271034757))
            Line((19.05, -15.1271034757), (25.4, -15.1271034757))
            Line((25.4, -15.1271034757), (25.4, -8.7771034757))
        make_face()
    revolve(axis=Axis((25.4, -27.2314734757, 0), (1, 0, 0)), mode=Mode.SUBTRACT)

    # F8_s57 → F8_t58 (revolve, cut)
    with BuildSketch(Plane.XZ.offset(25.266315788)):
        with BuildLine():
            ThreePointArc((18.45437, -25.4), (13.9642419395, -23.5401280605), (12.10437, -19.05))
            Line((12.10437, -19.05), (12.10437, -25.4))
            Line((12.10437, -25.4), (18.45437, -25.4))
        make_face()
    revolve(axis=Axis((0, -25.266315788, -25.4), (0, 0, 1)), mode=Mode.SUBTRACT)

    # F8_s59 → F8_t60 (revolve, cut)
    with BuildSketch(Plane.XY):
        with BuildLine():
            ThreePointArc((18.45437, 0), (13.9642419395, -1.8598719395), (12.10437, -6.35))
            Line((12.10437, -6.35), (12.10437, 0))
            Line((12.10437, 0), (18.45437, 0))
        make_face()
    revolve(axis=Axis((0, 0, 0), (0, -1, 0)), mode=Mode.SUBTRACT)

    # F8_s61 → F8_t62 (revolve, cut)
    with BuildSketch(Plane.XY):
        with BuildLine():
            ThreePointArc((18.45437, -50.8), (13.9642419395, -48.9401280605), (12.10437, -44.45))
            Line((12.10437, -44.45), (12.10437, -50.8))
            Line((12.10437, -50.8), (18.45437, -50.8))
        make_face()
    revolve(axis=Axis((0, -50.8, 0), (0, -1, 0)), mode=Mode.SUBTRACT)

    # F8_s63 → F8_t64 (revolve, cut)
    with BuildSketch(Plane.XZ.offset(25.266315788)):
        with BuildLine():
            ThreePointArc((18.45437, 25.4), (13.9642419395, 23.5401280605), (12.10437, 19.05))
            Line((12.10437, 19.05), (12.10437, 25.4))
            Line((12.10437, 25.4), (18.45437, 25.4))
        make_face()
    revolve(axis=Axis((0, -25.266315788, 25.4), (0, 0, 1)), mode=Mode.SUBTRACT)

    # F8_s65 → F8_t66 (revolve, cut)
    with BuildSketch(Plane.XY):
        with BuildLine():
            ThreePointArc((-25.4, -8.7771034757), (-23.5401280605, -13.2672315362), (-19.05, -15.1271034757))
            Line((-19.05, -15.1271034757), (-25.4, -15.1271034757))
            Line((-25.4, -15.1271034757), (-25.4, -8.7771034757))
        make_face()
    revolve(axis=Axis((-25.4, -27.2314734757, 0), (1, 0, 0)), mode=Mode.SUBTRACT)


solid = f1_8.part
